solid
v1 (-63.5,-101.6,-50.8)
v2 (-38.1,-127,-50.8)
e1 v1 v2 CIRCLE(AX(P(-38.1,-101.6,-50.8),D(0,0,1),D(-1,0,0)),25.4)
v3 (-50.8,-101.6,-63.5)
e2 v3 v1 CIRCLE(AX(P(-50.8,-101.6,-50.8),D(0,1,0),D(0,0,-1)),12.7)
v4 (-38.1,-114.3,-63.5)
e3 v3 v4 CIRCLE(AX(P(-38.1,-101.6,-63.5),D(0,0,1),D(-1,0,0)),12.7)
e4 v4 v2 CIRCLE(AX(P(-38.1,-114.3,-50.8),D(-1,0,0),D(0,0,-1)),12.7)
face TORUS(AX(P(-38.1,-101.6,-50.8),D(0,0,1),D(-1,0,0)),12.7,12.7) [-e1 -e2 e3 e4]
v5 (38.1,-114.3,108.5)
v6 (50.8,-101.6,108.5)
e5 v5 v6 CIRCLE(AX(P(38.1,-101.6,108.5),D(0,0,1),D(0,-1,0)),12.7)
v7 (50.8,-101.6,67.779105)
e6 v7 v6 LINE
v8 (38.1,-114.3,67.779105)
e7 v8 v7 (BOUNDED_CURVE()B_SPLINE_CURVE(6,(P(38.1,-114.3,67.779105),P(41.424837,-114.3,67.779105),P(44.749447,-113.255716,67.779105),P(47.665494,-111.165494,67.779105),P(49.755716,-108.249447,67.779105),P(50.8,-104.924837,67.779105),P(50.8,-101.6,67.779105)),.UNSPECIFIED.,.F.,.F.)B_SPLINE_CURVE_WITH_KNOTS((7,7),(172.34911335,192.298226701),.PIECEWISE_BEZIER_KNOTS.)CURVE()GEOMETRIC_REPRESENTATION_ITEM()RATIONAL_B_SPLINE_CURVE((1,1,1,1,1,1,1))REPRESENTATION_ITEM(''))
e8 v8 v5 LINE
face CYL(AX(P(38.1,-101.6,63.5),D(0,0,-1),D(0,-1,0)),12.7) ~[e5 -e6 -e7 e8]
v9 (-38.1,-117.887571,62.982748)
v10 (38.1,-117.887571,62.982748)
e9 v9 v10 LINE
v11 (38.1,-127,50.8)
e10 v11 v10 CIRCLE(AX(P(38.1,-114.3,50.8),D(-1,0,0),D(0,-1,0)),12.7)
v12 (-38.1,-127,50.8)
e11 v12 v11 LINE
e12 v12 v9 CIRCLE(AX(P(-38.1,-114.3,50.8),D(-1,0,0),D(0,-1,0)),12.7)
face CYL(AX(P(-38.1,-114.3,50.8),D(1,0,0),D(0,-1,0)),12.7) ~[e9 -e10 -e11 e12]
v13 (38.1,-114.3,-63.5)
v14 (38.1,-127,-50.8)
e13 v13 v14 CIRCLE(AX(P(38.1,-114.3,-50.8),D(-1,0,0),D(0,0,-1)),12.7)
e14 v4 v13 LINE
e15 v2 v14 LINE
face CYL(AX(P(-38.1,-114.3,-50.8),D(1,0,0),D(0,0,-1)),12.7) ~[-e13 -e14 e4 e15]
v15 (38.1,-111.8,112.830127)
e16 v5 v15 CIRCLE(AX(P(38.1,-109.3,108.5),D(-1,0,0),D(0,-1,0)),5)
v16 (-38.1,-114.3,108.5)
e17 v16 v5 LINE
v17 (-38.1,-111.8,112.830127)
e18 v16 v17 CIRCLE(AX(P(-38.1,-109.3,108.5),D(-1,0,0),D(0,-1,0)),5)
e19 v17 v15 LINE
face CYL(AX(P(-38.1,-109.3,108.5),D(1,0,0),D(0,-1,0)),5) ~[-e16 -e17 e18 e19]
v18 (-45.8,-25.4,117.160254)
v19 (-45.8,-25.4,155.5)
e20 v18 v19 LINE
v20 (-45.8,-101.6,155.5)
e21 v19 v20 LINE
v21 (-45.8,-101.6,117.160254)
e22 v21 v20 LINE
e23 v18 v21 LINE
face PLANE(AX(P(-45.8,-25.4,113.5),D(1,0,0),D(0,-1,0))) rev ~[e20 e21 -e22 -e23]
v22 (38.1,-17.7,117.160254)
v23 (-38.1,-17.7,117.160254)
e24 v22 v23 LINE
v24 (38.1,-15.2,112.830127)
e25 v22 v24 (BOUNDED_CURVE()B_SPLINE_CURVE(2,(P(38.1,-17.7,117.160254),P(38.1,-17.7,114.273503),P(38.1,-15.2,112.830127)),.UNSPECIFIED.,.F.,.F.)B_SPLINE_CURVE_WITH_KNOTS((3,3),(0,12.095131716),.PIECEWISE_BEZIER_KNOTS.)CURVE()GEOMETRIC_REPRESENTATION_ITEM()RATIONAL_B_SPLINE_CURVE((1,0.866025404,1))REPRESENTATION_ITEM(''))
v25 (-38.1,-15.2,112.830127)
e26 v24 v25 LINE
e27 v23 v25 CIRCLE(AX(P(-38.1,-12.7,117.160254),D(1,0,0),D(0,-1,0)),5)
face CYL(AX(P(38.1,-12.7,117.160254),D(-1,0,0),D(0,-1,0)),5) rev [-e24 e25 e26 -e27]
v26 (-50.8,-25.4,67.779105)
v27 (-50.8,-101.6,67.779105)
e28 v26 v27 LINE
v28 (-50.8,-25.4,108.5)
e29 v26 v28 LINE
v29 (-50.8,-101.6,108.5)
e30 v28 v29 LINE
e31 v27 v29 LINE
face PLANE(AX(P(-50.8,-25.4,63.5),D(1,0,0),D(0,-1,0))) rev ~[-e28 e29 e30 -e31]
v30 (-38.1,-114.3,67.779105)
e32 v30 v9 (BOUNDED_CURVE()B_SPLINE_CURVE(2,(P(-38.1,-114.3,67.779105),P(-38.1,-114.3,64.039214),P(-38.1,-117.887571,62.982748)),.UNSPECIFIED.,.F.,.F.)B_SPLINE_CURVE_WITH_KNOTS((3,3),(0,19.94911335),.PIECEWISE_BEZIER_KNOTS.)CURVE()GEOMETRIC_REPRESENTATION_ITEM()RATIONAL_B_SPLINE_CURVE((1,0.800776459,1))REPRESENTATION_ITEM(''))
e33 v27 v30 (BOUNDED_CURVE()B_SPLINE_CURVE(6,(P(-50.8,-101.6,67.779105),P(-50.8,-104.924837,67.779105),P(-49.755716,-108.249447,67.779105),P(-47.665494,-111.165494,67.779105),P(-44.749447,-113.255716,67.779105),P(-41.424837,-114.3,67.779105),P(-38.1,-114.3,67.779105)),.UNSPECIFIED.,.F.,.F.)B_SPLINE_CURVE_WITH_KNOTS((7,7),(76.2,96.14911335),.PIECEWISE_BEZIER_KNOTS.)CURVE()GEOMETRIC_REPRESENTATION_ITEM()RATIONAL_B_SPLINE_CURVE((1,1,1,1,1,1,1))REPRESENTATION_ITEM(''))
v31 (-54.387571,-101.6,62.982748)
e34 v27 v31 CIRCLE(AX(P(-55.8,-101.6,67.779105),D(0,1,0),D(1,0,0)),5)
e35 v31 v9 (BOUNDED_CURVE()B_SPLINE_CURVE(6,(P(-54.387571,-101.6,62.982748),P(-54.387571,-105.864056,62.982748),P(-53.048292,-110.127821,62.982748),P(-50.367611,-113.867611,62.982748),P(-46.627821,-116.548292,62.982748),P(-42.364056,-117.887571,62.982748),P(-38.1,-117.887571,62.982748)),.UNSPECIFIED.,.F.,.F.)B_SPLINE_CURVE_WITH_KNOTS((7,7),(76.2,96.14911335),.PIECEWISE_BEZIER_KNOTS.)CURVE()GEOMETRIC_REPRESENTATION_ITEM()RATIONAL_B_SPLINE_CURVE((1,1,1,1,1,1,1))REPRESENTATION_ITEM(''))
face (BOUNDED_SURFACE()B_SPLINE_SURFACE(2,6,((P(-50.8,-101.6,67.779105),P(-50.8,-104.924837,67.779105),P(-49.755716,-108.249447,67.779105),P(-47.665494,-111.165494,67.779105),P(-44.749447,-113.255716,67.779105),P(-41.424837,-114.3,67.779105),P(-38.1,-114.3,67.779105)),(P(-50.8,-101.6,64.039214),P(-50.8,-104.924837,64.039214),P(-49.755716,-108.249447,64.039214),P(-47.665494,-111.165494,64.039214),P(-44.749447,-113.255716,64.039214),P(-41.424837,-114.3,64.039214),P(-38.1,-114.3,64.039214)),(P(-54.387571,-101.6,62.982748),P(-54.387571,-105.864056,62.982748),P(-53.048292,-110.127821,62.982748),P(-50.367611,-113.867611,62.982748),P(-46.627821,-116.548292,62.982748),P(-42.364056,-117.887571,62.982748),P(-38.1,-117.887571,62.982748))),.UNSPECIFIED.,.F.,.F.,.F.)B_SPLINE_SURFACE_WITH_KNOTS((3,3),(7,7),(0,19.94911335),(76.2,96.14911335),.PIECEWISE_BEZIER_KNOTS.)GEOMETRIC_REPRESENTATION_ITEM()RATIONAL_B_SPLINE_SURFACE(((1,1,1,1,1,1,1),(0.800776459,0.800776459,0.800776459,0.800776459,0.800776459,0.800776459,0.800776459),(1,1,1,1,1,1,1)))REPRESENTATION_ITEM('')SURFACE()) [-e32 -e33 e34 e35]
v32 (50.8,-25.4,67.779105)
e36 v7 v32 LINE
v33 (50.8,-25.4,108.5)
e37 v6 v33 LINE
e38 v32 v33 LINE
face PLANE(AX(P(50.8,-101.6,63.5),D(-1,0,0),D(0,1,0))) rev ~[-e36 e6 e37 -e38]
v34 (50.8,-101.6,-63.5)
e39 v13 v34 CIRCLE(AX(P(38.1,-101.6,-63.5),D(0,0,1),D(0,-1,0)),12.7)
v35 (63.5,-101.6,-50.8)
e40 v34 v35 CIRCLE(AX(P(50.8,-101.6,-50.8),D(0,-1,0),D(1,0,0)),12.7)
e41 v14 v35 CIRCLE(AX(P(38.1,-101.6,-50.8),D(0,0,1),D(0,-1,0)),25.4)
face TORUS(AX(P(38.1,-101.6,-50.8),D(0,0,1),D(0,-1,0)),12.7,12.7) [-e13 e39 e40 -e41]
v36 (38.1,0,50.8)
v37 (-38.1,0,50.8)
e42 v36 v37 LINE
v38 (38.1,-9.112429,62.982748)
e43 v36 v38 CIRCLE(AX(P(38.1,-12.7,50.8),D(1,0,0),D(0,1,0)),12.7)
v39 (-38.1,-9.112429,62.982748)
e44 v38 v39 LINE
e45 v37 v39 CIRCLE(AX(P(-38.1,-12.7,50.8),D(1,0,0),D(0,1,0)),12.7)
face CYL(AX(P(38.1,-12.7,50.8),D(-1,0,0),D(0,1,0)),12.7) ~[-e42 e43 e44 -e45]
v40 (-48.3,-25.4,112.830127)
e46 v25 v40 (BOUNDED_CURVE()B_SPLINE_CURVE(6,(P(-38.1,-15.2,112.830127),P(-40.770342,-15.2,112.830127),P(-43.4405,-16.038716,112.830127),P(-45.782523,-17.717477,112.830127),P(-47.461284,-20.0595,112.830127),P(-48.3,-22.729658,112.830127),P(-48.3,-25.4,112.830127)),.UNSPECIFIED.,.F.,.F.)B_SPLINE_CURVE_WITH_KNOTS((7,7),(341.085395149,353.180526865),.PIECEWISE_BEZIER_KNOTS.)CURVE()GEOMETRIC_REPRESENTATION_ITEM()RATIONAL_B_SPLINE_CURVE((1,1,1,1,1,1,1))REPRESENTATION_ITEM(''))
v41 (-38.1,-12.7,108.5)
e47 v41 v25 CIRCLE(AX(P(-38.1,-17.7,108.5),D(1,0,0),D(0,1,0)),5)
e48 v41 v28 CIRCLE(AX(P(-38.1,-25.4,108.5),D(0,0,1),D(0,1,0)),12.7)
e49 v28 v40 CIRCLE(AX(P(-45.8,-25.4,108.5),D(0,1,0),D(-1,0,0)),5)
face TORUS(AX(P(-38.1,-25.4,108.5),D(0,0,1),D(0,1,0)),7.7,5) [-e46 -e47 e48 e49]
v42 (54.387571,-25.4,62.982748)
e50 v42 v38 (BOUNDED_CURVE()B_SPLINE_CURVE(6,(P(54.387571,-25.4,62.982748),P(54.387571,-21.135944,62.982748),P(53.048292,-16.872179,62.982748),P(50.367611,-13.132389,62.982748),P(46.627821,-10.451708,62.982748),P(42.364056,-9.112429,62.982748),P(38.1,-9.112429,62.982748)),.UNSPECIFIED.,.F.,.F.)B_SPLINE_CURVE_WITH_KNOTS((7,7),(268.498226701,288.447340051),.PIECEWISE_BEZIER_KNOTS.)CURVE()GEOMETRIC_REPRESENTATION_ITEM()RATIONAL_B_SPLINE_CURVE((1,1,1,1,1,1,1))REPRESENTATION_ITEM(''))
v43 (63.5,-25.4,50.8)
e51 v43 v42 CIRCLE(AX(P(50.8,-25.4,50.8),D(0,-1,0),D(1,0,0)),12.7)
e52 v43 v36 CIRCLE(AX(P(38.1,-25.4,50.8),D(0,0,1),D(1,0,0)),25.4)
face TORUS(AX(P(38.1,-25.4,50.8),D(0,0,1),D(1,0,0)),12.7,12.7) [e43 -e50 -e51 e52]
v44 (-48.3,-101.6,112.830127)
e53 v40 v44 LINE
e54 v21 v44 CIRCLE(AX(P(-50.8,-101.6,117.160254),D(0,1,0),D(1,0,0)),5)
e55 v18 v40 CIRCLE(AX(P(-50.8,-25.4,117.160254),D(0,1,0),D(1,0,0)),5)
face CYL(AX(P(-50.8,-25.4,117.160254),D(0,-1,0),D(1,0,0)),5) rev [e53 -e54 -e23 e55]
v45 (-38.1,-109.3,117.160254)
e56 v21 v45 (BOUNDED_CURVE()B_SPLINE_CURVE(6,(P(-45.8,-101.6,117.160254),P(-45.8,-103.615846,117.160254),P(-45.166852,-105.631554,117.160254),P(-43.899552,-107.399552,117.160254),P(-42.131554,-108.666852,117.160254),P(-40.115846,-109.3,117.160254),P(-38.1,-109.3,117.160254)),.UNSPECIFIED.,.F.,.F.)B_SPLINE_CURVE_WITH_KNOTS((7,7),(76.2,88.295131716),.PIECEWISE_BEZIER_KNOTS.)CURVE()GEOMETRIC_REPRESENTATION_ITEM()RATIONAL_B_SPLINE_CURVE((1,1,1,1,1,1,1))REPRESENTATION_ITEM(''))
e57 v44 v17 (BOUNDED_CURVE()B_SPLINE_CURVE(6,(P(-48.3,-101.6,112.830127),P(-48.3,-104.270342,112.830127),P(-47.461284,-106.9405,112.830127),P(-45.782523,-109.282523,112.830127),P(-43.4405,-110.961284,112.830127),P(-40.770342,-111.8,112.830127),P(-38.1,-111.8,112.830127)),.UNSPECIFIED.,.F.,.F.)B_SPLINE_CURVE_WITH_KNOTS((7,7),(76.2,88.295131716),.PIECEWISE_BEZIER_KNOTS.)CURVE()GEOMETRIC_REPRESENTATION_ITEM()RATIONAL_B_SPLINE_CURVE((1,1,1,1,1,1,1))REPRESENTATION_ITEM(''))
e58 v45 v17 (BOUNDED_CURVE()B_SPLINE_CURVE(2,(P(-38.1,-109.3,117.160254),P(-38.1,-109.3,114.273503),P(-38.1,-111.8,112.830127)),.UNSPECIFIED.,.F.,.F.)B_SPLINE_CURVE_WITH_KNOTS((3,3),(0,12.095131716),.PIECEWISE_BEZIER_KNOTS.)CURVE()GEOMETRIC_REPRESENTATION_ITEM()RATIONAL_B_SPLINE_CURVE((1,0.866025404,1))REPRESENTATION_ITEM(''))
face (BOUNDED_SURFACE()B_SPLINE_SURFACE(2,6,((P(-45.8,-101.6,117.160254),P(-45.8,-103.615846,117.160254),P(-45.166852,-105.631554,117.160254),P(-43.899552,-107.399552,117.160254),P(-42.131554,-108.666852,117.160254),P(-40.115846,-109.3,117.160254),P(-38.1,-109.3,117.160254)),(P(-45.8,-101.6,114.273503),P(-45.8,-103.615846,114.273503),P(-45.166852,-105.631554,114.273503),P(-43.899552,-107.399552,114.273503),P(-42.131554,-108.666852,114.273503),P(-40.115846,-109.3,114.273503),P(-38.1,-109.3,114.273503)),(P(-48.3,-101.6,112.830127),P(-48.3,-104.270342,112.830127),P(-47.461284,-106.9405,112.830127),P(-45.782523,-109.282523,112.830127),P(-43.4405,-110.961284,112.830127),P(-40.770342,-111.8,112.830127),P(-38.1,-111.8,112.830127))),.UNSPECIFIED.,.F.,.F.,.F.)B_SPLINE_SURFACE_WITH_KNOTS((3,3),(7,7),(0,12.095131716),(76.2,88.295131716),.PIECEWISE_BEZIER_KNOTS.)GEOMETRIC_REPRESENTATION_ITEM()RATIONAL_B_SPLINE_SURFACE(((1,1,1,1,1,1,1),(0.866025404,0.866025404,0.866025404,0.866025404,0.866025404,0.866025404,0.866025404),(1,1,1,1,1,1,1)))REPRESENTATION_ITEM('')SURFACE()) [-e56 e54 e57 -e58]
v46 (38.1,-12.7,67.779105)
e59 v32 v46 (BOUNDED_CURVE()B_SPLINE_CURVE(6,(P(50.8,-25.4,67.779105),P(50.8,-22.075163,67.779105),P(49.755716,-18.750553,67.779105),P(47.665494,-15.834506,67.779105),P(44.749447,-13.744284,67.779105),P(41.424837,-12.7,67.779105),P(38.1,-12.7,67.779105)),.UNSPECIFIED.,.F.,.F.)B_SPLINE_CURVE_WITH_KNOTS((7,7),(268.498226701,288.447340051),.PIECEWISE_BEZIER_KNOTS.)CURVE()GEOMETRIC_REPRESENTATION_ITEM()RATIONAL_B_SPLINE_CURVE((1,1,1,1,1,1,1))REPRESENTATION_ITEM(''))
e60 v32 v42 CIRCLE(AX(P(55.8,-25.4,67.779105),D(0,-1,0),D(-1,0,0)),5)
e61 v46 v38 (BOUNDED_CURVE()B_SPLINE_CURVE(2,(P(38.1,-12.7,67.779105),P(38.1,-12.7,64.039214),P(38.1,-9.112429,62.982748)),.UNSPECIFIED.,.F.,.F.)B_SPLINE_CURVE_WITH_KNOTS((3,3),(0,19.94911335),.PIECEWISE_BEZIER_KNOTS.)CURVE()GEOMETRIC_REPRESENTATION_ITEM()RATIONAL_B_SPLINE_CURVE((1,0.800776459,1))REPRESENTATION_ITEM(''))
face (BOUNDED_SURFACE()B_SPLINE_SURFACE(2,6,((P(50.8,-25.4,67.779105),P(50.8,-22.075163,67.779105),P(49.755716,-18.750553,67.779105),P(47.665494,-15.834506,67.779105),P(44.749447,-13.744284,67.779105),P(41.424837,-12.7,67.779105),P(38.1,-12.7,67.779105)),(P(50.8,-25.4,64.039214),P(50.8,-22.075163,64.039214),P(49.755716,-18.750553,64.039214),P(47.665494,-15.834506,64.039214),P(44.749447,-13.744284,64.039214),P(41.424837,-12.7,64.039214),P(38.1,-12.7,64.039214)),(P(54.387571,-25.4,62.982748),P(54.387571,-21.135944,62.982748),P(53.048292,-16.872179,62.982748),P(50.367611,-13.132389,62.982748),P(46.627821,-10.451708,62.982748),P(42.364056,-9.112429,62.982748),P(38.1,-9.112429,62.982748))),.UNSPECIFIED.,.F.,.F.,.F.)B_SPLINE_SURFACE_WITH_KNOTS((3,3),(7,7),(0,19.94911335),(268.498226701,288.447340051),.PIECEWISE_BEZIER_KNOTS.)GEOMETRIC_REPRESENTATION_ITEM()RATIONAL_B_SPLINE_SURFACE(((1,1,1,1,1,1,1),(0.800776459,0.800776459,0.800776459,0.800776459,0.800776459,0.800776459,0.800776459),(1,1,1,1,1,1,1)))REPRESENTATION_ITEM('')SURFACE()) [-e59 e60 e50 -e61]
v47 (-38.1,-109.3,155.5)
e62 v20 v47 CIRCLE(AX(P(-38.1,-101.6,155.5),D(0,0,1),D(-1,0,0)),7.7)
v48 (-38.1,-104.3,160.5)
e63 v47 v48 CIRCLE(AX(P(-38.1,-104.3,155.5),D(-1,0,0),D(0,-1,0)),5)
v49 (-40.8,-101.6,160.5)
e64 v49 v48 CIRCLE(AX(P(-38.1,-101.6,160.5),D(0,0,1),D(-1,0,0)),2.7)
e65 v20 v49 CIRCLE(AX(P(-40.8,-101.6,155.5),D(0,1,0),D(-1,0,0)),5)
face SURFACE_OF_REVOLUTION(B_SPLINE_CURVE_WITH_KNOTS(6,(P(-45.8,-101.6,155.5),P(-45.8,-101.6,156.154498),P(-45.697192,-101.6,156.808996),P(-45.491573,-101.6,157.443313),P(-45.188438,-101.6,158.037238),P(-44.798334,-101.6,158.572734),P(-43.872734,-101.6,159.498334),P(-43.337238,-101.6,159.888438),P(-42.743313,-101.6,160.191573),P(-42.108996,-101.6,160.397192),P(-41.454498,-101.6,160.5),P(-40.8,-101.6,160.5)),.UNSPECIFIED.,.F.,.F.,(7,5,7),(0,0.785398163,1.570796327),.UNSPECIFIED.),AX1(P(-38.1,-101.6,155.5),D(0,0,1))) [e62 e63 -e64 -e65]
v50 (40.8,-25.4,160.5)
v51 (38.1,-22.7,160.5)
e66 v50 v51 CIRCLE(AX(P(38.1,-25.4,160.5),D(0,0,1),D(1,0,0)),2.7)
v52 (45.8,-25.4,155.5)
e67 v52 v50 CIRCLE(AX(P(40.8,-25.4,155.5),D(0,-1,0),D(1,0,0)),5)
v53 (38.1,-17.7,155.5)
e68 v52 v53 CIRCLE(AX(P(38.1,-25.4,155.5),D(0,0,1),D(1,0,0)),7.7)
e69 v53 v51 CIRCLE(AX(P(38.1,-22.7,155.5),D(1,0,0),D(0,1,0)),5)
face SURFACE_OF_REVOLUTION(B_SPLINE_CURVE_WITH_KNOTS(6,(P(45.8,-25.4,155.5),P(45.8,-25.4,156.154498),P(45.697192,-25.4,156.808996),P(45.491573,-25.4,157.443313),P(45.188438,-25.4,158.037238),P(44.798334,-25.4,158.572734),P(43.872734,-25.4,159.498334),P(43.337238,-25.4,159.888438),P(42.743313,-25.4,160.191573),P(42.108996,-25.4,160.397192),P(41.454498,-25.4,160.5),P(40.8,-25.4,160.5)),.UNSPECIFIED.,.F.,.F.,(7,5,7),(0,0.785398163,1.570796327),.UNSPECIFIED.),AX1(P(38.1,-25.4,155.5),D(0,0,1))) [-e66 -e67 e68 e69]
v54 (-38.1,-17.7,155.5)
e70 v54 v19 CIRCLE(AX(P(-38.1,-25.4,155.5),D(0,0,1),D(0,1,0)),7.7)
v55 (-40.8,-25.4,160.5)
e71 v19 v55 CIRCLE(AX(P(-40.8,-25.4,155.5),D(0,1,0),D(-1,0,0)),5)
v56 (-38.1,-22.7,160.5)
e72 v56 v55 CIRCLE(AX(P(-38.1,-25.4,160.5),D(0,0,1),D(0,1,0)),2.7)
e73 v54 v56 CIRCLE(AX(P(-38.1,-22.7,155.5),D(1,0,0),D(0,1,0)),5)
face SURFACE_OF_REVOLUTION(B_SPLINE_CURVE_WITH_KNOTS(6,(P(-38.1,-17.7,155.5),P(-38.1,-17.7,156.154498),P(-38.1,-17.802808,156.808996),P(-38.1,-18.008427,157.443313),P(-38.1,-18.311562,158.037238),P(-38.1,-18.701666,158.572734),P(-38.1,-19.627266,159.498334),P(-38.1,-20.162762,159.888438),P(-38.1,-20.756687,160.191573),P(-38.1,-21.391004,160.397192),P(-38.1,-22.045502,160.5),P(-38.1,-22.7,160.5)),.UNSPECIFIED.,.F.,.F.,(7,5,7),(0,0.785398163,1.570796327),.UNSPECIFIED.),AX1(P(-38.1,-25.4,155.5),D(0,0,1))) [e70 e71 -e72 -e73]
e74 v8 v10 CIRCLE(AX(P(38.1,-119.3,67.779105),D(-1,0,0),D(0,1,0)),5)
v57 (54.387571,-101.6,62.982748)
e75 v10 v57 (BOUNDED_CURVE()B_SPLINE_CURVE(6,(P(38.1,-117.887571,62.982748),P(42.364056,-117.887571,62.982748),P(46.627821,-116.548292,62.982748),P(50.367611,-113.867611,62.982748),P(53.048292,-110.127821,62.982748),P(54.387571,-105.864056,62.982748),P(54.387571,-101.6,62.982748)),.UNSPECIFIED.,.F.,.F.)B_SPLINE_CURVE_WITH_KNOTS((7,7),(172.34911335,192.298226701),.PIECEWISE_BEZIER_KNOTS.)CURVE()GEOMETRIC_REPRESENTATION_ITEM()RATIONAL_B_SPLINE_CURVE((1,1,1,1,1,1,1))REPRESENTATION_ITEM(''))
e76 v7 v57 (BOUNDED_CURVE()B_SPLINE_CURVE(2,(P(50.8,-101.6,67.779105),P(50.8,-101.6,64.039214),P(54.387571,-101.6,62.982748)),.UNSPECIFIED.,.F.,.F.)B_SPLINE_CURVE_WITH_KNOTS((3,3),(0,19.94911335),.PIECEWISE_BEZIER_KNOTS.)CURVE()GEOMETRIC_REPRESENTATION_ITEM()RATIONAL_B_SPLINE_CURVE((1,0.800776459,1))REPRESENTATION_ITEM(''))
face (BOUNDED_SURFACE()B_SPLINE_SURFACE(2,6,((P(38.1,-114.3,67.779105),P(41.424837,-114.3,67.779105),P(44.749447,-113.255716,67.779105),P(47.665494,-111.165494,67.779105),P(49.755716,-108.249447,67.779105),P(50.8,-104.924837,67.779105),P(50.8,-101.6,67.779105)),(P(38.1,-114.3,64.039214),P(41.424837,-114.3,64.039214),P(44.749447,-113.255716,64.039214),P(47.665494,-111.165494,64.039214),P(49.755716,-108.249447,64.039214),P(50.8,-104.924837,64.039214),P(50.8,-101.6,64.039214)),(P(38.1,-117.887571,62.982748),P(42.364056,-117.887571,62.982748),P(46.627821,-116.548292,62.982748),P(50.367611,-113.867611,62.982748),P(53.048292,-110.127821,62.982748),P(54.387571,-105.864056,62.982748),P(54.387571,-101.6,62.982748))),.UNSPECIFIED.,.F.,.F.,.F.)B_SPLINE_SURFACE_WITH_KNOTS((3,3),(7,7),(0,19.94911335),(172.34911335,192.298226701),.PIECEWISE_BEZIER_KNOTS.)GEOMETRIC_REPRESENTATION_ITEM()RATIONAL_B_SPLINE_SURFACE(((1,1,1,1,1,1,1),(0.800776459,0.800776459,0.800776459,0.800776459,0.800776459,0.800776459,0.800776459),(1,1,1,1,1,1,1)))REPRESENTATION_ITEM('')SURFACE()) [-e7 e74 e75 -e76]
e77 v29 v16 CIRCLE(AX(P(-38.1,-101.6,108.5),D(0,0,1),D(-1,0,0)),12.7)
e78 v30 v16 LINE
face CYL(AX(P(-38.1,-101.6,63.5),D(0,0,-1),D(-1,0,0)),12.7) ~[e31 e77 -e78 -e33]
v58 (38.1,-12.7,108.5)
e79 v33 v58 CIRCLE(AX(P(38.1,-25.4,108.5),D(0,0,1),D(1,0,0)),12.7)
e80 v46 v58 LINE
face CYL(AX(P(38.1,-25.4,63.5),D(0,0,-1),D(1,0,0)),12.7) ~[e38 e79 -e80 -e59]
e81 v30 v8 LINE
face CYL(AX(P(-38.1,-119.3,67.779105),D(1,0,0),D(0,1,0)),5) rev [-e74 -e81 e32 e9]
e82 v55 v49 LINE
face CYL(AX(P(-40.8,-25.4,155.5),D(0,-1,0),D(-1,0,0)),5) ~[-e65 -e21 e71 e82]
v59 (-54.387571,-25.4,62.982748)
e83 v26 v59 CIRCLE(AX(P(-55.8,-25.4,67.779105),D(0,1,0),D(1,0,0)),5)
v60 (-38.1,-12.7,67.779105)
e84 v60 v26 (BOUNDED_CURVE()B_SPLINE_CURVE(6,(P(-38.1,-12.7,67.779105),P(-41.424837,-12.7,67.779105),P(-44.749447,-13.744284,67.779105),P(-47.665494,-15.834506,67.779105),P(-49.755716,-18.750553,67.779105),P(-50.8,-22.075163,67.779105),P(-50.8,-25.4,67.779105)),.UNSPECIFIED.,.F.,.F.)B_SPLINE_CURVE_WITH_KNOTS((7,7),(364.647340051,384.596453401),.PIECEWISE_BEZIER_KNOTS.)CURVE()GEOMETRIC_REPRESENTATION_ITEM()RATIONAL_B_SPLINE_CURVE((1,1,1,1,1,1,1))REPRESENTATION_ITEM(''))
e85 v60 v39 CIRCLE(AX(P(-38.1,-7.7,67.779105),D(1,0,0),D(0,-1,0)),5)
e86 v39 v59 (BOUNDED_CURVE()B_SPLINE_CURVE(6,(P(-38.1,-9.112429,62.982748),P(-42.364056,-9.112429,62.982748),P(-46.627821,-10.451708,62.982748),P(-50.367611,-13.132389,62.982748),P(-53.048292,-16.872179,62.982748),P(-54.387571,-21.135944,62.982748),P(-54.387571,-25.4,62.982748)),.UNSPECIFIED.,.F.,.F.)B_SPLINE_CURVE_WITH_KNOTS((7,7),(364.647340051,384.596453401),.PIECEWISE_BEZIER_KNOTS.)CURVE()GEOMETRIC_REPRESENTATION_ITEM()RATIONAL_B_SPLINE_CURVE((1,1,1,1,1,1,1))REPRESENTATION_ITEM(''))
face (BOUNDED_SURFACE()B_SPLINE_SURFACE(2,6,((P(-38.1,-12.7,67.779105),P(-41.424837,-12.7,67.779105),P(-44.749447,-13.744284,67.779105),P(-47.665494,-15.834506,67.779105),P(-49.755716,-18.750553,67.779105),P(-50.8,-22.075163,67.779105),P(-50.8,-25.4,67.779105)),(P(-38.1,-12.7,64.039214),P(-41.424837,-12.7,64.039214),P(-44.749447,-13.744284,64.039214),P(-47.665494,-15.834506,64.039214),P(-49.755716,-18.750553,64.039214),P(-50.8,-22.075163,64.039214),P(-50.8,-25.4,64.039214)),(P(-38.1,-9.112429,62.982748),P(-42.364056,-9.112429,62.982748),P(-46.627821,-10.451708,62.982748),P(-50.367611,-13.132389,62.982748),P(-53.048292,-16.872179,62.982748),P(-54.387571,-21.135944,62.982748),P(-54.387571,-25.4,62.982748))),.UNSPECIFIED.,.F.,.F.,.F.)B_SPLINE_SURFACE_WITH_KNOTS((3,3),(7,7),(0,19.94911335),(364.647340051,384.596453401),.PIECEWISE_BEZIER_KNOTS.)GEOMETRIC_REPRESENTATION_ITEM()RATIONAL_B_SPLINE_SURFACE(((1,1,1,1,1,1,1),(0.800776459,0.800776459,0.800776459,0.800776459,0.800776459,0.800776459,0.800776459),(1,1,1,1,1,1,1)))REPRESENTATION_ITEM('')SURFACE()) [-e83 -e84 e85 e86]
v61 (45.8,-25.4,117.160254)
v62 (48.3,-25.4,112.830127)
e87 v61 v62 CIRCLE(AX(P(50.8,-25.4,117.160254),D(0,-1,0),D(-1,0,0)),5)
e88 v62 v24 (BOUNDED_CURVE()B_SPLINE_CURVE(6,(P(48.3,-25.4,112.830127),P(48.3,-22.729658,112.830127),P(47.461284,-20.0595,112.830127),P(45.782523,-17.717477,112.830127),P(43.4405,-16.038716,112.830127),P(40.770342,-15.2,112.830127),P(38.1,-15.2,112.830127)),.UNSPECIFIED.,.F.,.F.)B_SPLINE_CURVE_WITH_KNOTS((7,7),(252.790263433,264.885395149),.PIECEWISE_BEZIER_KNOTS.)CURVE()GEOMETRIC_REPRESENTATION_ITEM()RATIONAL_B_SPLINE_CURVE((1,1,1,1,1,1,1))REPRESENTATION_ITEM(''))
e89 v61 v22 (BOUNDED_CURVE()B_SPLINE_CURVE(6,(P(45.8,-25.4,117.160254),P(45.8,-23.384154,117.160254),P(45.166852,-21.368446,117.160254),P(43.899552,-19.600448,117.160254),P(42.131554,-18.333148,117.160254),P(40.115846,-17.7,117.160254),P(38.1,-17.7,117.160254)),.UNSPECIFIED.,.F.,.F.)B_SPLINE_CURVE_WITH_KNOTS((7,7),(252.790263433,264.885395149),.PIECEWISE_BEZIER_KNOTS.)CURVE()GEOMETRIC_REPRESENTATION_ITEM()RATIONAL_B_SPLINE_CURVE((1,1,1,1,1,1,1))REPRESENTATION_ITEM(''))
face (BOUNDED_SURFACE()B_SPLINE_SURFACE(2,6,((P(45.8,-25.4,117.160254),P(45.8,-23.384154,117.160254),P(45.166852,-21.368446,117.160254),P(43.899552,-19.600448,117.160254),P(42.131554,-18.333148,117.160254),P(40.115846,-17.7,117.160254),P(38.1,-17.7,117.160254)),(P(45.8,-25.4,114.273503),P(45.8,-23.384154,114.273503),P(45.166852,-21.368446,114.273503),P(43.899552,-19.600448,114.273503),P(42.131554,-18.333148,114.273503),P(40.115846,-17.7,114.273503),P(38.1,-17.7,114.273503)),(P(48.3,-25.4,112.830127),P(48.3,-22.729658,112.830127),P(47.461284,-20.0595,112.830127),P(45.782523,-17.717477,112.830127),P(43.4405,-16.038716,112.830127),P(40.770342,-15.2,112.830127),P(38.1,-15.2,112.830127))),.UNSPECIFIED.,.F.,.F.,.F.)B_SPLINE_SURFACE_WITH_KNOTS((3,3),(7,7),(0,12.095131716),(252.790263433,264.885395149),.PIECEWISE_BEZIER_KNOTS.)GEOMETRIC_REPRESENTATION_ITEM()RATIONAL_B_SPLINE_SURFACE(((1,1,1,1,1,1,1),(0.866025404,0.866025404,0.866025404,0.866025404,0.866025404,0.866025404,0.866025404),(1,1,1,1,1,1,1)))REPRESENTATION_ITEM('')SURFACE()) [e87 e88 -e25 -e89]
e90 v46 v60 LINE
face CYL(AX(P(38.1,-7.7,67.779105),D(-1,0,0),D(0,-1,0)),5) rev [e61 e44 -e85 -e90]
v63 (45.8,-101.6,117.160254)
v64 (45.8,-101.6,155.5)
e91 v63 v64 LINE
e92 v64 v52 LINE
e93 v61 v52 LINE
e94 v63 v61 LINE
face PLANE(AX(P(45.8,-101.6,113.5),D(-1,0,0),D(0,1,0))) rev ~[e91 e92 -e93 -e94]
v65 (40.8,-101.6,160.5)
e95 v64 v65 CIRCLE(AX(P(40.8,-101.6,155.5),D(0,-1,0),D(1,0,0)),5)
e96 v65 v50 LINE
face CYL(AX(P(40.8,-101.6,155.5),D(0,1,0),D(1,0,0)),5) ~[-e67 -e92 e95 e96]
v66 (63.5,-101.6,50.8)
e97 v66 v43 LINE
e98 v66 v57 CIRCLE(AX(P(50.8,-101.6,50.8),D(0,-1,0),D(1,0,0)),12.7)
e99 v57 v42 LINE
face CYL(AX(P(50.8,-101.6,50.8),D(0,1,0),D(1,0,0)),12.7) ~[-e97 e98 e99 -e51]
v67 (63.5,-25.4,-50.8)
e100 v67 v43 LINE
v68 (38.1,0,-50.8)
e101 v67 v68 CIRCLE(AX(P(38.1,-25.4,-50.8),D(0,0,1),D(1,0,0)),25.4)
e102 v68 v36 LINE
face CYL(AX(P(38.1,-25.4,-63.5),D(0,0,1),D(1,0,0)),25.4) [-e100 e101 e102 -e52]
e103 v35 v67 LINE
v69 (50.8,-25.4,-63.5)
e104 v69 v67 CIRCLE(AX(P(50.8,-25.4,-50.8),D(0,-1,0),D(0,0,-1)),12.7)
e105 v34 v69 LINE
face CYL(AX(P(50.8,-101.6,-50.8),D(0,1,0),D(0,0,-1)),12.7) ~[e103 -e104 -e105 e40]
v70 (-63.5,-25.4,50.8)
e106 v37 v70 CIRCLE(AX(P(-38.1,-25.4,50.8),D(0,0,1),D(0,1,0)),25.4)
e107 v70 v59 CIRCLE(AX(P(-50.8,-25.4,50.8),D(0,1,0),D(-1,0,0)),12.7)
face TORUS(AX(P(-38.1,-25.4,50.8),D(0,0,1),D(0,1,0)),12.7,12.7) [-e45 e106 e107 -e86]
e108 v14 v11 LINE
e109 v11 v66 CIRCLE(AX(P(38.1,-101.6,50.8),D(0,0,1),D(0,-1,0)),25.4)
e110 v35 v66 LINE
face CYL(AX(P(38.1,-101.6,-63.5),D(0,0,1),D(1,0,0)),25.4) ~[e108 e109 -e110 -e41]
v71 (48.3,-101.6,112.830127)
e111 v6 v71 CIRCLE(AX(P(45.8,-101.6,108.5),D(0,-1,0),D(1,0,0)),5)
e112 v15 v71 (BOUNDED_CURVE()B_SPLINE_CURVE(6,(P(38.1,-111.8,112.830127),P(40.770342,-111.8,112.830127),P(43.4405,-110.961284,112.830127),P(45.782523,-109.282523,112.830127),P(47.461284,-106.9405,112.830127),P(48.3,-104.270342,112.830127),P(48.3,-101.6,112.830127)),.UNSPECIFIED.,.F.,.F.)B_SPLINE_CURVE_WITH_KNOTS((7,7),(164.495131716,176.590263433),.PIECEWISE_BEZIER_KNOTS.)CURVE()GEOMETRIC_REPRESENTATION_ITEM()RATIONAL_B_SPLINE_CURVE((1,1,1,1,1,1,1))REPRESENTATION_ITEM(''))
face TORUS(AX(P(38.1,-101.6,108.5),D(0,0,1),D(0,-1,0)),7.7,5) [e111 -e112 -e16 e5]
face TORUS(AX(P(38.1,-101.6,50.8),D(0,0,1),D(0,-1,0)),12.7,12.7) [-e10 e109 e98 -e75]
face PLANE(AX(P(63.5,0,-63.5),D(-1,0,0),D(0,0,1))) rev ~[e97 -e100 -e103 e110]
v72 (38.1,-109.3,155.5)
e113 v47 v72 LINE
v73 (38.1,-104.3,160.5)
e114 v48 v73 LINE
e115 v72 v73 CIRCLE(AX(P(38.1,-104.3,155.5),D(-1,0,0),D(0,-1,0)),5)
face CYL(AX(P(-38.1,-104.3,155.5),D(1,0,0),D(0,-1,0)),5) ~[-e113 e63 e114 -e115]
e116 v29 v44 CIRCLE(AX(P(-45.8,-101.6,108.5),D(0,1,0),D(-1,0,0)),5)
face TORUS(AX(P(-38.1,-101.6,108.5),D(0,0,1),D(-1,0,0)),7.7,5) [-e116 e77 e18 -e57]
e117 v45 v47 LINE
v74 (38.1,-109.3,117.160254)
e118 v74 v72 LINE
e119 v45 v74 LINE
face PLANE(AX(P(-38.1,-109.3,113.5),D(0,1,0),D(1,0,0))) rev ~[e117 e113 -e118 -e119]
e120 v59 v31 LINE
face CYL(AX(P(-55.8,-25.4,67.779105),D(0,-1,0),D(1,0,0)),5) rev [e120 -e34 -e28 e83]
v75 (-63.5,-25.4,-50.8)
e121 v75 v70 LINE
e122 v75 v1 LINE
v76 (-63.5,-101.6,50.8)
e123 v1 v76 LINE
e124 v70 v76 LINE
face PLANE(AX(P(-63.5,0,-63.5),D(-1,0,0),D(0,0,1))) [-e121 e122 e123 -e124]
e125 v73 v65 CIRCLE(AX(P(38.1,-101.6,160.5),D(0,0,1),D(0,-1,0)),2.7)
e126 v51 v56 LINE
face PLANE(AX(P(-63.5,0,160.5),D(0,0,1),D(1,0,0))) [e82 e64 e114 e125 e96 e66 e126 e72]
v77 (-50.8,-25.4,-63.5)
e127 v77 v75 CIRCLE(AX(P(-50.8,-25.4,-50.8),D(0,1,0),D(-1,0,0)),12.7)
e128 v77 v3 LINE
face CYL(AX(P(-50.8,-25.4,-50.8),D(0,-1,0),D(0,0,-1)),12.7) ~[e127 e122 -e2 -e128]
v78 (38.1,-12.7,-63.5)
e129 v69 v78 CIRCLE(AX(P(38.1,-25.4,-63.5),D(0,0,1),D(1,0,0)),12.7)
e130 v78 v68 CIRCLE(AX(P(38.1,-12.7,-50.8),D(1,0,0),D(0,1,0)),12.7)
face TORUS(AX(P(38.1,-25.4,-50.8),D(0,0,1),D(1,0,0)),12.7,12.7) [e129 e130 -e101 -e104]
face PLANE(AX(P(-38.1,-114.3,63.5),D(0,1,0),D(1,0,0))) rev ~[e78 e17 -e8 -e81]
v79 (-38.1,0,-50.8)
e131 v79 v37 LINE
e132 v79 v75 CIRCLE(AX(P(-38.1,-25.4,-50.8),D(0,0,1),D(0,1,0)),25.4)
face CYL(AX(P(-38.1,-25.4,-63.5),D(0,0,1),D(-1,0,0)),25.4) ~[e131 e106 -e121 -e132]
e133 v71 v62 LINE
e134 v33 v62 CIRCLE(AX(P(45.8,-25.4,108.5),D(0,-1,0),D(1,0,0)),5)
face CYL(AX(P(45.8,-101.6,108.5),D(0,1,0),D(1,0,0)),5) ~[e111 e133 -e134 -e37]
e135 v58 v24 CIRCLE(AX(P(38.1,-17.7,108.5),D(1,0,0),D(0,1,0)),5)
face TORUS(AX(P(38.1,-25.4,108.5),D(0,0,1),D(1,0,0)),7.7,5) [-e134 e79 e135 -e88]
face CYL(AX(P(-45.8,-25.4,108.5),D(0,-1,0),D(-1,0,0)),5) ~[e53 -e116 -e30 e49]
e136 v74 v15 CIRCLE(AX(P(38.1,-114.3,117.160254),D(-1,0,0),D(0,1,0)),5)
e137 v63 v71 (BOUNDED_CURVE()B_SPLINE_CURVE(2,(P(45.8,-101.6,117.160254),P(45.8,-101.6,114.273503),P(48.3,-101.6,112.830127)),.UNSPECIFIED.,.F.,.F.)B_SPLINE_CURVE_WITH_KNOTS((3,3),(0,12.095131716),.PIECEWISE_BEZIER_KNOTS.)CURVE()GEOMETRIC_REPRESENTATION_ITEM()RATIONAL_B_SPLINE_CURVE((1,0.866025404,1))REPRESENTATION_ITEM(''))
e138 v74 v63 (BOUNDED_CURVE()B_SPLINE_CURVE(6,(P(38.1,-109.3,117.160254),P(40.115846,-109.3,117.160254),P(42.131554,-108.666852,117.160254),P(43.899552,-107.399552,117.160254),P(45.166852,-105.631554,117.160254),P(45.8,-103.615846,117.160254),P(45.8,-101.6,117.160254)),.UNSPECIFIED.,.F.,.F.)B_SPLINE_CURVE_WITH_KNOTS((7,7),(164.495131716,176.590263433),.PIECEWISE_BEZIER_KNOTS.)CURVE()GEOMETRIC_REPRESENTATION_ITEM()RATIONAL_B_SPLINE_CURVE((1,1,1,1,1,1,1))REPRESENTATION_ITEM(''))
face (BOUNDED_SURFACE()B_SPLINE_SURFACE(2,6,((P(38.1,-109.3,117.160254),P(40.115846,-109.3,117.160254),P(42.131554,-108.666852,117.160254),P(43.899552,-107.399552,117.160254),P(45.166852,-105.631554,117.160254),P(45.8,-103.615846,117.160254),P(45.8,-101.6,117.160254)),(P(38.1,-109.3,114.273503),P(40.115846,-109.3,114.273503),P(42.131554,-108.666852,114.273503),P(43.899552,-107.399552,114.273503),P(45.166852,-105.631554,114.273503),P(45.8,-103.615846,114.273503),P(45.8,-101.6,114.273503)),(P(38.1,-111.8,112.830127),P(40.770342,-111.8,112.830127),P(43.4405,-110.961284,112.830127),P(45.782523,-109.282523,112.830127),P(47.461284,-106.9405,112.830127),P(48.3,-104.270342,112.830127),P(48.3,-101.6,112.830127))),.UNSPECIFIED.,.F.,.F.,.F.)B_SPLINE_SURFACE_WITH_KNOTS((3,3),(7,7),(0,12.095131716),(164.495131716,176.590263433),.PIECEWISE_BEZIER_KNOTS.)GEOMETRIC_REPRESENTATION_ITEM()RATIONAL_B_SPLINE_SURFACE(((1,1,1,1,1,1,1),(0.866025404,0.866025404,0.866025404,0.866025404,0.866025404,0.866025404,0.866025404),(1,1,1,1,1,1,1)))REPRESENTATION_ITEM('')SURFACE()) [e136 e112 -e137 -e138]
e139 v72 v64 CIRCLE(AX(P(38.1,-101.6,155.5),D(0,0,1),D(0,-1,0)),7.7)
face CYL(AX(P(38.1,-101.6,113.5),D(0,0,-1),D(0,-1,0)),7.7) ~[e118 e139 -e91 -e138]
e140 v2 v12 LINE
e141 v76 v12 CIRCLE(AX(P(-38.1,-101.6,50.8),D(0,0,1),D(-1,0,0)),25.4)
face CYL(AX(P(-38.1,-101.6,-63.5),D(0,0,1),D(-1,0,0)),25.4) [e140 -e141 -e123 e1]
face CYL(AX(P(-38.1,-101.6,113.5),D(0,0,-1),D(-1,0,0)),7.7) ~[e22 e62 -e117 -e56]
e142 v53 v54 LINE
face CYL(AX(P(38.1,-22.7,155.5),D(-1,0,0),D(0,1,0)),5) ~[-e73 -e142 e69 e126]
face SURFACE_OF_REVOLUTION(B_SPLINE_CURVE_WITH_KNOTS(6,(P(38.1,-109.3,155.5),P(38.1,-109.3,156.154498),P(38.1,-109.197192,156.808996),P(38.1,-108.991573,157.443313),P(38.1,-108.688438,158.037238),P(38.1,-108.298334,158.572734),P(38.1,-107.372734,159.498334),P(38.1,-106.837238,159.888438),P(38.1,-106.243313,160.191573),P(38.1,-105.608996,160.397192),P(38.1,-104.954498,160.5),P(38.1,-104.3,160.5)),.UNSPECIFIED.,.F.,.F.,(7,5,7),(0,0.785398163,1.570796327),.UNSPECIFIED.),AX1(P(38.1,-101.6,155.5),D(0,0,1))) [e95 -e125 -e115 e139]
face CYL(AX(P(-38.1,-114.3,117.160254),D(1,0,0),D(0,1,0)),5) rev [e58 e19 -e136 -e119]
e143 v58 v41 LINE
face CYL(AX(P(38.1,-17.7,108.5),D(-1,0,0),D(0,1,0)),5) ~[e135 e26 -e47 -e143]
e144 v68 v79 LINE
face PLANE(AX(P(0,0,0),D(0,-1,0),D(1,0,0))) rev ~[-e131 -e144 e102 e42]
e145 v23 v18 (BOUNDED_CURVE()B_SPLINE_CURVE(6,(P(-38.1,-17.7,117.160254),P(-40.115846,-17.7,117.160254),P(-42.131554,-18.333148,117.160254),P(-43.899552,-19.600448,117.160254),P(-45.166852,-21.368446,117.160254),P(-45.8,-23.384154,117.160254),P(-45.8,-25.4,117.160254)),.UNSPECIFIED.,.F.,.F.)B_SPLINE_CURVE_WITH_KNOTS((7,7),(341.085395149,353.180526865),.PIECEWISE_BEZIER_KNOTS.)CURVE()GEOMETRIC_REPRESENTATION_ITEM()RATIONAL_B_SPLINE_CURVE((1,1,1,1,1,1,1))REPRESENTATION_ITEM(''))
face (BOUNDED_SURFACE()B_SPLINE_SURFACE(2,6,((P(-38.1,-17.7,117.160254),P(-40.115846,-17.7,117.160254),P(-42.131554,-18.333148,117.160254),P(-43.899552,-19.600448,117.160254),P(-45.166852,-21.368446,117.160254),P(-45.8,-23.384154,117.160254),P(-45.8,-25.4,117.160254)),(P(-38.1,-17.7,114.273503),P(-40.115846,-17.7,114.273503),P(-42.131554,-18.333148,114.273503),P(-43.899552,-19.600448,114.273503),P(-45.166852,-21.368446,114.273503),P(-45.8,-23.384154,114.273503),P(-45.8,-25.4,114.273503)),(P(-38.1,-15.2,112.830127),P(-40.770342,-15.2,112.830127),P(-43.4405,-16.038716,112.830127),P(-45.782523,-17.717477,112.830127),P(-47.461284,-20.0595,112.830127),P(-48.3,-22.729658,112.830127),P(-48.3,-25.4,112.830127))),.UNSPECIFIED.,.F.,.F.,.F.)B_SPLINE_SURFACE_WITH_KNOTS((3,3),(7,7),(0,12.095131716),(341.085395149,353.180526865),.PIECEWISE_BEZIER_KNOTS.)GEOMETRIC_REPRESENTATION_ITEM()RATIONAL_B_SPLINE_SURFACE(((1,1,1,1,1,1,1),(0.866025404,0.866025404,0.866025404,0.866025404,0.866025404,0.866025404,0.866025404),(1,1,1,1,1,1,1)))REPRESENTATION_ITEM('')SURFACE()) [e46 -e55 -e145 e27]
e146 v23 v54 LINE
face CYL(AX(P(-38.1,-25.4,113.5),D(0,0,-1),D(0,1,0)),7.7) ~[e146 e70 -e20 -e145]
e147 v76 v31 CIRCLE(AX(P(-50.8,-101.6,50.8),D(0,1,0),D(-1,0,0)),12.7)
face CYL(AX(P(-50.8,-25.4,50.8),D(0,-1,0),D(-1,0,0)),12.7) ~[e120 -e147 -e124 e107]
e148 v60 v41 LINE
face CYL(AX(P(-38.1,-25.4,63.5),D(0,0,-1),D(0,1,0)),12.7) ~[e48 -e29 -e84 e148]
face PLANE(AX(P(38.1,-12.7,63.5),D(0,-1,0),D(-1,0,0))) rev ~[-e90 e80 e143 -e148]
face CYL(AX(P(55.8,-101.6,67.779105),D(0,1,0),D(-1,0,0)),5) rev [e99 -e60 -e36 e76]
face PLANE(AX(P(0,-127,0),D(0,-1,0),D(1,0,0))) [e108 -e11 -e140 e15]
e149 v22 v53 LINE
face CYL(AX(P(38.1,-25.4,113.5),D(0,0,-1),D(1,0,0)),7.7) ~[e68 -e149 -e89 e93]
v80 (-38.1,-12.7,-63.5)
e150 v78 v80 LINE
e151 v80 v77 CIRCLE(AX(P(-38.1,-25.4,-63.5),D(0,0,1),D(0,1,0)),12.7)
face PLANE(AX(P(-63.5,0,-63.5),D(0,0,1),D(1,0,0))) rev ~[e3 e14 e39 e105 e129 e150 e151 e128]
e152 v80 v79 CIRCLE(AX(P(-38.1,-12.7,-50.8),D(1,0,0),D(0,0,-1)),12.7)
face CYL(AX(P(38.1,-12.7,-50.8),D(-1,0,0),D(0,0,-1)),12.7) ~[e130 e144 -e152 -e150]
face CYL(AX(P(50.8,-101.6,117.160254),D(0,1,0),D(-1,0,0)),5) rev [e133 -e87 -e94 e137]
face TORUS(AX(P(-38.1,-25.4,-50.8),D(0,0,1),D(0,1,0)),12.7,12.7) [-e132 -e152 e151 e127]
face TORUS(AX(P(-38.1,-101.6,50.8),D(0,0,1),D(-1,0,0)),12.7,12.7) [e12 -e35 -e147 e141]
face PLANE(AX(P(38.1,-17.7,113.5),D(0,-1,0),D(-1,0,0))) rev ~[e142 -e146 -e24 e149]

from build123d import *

# Parameters (mm, degrees)
F0_W     = 127
F0_H     = 127
F1_DEPTH = 127
F2_R     = 25.4
F3_R     = 12.7
F4_DEPTH = 50
F5_R     = 5
F6_DEPTH = 47
F7_R     = 5


# Not quite as in the source:
# - two fillets or chamfers of one size are made in one step


with BuildPart() as f1:
    # F0 (on Front) → F1 (new body)
    with BuildSketch(Plane.XZ):
        Rectangle(F0_W, F0_H)
    extrude(amount=F1_DEPTH)

    # F2
    f2_edges = [f1.edges().sort_by_distance(p)[0] for p in [
        (-63.5, -127, 0),
        (63.5, -127, 0),
        (-63.5, 0, 0),
        (63.5, 0, 0),
    ]]
    fillet(f2_edges, radius=F2_R)

    # F3
    f3_edges = [f1.edges().sort_by_distance(p)[0] for p in [
        (-63.5, -63.5, 63.5),
        (0, -127, -63.5),
        (63.5, -63.5, -63.5),
        (56.060512, -7.439488, -63.5),
        (56.060512, -119.560512, -63.5),
        (0, 0, -63.5),
        (-56.060512, -7.439488, -63.5),
        (-56.060512, -119.560512, -63.5),
        (-63.5, -63.5, -63.5),
    ]]
    fillet(f3_edges, radius=F3_R)

    # F4 (add): a face of the model
    f4_faces = [f1.faces().sort_by_distance(p)[0] for p in [
        (0, -63.5, 63.5),
    ]]
    extrude(f4_faces, amount=F4_DEPTH)

    # F5
    f5_edges = [f1.edges().sort_by_distance(p)[0] for p in [
        (-50.8, -63.5, 63.5),
        (-47.080256, -16.419744, 63.5),
        (-50.8, -63.5, 113.5),
        (-47.080256, -110.580256, 63.5),
        (0, -12.7, 63.5),
        (-47.080256, -16.419744, 113.5),
        (-47.080256, -110.580256, 113.5),
        (0, -12.7, 113.5),
        (0, -114.3, 113.5),
        (47.080256, -16.419744, 113.5),
        (47.080256, -110.580256, 113.5),
        (50.8, -63.5, 113.5),
        (0, -114.3, 63.5),
        (47.080256, -16.419744, 63.5),
        (47.080256, -110.580256, 63.5),
        (50.8, -63.5, 63.5),
    ]]
    fillet(f5_edges, radius=F5_R)

    # F6 (add): a face of the model
    f6_faces = [f1.faces().sort_by_distance(p)[0] for p in [
        (0, -63.5, 113.5),
    ]]
    extrude(f6_faces, amount=F6_DEPTH)

    # F7
    f7_edges = [f1.edges().sort_by_distance(p)[0] for p in [
        (-45.8, -63.5, 113.5),
        (-43.544722, -19.955278, 113.5),
        (-45.8, -63.5, 160.5),
        (-43.544722, -107.044722, 113.5),
        (0, -17.7, 113.5),
        (-43.544722, -19.955278, 160.5),
        (-43.544722, -107.044722, 160.5),
        (0, -17.7, 160.5),
        (0, -109.3, 160.5),
        (43.544722, -19.955278, 160.5),
        (43.544722, -107.044722, 160.5),
        (45.8, -63.5, 160.5),
        (0, -109.3, 113.5),
        (43.544722, -19.955278, 113.5),
        (43.544722, -107.044722, 113.5),
        (45.8, -63.5, 113.5),
    ]]
    fillet(f7_edges, radius=F7_R)


solid = f1.part
